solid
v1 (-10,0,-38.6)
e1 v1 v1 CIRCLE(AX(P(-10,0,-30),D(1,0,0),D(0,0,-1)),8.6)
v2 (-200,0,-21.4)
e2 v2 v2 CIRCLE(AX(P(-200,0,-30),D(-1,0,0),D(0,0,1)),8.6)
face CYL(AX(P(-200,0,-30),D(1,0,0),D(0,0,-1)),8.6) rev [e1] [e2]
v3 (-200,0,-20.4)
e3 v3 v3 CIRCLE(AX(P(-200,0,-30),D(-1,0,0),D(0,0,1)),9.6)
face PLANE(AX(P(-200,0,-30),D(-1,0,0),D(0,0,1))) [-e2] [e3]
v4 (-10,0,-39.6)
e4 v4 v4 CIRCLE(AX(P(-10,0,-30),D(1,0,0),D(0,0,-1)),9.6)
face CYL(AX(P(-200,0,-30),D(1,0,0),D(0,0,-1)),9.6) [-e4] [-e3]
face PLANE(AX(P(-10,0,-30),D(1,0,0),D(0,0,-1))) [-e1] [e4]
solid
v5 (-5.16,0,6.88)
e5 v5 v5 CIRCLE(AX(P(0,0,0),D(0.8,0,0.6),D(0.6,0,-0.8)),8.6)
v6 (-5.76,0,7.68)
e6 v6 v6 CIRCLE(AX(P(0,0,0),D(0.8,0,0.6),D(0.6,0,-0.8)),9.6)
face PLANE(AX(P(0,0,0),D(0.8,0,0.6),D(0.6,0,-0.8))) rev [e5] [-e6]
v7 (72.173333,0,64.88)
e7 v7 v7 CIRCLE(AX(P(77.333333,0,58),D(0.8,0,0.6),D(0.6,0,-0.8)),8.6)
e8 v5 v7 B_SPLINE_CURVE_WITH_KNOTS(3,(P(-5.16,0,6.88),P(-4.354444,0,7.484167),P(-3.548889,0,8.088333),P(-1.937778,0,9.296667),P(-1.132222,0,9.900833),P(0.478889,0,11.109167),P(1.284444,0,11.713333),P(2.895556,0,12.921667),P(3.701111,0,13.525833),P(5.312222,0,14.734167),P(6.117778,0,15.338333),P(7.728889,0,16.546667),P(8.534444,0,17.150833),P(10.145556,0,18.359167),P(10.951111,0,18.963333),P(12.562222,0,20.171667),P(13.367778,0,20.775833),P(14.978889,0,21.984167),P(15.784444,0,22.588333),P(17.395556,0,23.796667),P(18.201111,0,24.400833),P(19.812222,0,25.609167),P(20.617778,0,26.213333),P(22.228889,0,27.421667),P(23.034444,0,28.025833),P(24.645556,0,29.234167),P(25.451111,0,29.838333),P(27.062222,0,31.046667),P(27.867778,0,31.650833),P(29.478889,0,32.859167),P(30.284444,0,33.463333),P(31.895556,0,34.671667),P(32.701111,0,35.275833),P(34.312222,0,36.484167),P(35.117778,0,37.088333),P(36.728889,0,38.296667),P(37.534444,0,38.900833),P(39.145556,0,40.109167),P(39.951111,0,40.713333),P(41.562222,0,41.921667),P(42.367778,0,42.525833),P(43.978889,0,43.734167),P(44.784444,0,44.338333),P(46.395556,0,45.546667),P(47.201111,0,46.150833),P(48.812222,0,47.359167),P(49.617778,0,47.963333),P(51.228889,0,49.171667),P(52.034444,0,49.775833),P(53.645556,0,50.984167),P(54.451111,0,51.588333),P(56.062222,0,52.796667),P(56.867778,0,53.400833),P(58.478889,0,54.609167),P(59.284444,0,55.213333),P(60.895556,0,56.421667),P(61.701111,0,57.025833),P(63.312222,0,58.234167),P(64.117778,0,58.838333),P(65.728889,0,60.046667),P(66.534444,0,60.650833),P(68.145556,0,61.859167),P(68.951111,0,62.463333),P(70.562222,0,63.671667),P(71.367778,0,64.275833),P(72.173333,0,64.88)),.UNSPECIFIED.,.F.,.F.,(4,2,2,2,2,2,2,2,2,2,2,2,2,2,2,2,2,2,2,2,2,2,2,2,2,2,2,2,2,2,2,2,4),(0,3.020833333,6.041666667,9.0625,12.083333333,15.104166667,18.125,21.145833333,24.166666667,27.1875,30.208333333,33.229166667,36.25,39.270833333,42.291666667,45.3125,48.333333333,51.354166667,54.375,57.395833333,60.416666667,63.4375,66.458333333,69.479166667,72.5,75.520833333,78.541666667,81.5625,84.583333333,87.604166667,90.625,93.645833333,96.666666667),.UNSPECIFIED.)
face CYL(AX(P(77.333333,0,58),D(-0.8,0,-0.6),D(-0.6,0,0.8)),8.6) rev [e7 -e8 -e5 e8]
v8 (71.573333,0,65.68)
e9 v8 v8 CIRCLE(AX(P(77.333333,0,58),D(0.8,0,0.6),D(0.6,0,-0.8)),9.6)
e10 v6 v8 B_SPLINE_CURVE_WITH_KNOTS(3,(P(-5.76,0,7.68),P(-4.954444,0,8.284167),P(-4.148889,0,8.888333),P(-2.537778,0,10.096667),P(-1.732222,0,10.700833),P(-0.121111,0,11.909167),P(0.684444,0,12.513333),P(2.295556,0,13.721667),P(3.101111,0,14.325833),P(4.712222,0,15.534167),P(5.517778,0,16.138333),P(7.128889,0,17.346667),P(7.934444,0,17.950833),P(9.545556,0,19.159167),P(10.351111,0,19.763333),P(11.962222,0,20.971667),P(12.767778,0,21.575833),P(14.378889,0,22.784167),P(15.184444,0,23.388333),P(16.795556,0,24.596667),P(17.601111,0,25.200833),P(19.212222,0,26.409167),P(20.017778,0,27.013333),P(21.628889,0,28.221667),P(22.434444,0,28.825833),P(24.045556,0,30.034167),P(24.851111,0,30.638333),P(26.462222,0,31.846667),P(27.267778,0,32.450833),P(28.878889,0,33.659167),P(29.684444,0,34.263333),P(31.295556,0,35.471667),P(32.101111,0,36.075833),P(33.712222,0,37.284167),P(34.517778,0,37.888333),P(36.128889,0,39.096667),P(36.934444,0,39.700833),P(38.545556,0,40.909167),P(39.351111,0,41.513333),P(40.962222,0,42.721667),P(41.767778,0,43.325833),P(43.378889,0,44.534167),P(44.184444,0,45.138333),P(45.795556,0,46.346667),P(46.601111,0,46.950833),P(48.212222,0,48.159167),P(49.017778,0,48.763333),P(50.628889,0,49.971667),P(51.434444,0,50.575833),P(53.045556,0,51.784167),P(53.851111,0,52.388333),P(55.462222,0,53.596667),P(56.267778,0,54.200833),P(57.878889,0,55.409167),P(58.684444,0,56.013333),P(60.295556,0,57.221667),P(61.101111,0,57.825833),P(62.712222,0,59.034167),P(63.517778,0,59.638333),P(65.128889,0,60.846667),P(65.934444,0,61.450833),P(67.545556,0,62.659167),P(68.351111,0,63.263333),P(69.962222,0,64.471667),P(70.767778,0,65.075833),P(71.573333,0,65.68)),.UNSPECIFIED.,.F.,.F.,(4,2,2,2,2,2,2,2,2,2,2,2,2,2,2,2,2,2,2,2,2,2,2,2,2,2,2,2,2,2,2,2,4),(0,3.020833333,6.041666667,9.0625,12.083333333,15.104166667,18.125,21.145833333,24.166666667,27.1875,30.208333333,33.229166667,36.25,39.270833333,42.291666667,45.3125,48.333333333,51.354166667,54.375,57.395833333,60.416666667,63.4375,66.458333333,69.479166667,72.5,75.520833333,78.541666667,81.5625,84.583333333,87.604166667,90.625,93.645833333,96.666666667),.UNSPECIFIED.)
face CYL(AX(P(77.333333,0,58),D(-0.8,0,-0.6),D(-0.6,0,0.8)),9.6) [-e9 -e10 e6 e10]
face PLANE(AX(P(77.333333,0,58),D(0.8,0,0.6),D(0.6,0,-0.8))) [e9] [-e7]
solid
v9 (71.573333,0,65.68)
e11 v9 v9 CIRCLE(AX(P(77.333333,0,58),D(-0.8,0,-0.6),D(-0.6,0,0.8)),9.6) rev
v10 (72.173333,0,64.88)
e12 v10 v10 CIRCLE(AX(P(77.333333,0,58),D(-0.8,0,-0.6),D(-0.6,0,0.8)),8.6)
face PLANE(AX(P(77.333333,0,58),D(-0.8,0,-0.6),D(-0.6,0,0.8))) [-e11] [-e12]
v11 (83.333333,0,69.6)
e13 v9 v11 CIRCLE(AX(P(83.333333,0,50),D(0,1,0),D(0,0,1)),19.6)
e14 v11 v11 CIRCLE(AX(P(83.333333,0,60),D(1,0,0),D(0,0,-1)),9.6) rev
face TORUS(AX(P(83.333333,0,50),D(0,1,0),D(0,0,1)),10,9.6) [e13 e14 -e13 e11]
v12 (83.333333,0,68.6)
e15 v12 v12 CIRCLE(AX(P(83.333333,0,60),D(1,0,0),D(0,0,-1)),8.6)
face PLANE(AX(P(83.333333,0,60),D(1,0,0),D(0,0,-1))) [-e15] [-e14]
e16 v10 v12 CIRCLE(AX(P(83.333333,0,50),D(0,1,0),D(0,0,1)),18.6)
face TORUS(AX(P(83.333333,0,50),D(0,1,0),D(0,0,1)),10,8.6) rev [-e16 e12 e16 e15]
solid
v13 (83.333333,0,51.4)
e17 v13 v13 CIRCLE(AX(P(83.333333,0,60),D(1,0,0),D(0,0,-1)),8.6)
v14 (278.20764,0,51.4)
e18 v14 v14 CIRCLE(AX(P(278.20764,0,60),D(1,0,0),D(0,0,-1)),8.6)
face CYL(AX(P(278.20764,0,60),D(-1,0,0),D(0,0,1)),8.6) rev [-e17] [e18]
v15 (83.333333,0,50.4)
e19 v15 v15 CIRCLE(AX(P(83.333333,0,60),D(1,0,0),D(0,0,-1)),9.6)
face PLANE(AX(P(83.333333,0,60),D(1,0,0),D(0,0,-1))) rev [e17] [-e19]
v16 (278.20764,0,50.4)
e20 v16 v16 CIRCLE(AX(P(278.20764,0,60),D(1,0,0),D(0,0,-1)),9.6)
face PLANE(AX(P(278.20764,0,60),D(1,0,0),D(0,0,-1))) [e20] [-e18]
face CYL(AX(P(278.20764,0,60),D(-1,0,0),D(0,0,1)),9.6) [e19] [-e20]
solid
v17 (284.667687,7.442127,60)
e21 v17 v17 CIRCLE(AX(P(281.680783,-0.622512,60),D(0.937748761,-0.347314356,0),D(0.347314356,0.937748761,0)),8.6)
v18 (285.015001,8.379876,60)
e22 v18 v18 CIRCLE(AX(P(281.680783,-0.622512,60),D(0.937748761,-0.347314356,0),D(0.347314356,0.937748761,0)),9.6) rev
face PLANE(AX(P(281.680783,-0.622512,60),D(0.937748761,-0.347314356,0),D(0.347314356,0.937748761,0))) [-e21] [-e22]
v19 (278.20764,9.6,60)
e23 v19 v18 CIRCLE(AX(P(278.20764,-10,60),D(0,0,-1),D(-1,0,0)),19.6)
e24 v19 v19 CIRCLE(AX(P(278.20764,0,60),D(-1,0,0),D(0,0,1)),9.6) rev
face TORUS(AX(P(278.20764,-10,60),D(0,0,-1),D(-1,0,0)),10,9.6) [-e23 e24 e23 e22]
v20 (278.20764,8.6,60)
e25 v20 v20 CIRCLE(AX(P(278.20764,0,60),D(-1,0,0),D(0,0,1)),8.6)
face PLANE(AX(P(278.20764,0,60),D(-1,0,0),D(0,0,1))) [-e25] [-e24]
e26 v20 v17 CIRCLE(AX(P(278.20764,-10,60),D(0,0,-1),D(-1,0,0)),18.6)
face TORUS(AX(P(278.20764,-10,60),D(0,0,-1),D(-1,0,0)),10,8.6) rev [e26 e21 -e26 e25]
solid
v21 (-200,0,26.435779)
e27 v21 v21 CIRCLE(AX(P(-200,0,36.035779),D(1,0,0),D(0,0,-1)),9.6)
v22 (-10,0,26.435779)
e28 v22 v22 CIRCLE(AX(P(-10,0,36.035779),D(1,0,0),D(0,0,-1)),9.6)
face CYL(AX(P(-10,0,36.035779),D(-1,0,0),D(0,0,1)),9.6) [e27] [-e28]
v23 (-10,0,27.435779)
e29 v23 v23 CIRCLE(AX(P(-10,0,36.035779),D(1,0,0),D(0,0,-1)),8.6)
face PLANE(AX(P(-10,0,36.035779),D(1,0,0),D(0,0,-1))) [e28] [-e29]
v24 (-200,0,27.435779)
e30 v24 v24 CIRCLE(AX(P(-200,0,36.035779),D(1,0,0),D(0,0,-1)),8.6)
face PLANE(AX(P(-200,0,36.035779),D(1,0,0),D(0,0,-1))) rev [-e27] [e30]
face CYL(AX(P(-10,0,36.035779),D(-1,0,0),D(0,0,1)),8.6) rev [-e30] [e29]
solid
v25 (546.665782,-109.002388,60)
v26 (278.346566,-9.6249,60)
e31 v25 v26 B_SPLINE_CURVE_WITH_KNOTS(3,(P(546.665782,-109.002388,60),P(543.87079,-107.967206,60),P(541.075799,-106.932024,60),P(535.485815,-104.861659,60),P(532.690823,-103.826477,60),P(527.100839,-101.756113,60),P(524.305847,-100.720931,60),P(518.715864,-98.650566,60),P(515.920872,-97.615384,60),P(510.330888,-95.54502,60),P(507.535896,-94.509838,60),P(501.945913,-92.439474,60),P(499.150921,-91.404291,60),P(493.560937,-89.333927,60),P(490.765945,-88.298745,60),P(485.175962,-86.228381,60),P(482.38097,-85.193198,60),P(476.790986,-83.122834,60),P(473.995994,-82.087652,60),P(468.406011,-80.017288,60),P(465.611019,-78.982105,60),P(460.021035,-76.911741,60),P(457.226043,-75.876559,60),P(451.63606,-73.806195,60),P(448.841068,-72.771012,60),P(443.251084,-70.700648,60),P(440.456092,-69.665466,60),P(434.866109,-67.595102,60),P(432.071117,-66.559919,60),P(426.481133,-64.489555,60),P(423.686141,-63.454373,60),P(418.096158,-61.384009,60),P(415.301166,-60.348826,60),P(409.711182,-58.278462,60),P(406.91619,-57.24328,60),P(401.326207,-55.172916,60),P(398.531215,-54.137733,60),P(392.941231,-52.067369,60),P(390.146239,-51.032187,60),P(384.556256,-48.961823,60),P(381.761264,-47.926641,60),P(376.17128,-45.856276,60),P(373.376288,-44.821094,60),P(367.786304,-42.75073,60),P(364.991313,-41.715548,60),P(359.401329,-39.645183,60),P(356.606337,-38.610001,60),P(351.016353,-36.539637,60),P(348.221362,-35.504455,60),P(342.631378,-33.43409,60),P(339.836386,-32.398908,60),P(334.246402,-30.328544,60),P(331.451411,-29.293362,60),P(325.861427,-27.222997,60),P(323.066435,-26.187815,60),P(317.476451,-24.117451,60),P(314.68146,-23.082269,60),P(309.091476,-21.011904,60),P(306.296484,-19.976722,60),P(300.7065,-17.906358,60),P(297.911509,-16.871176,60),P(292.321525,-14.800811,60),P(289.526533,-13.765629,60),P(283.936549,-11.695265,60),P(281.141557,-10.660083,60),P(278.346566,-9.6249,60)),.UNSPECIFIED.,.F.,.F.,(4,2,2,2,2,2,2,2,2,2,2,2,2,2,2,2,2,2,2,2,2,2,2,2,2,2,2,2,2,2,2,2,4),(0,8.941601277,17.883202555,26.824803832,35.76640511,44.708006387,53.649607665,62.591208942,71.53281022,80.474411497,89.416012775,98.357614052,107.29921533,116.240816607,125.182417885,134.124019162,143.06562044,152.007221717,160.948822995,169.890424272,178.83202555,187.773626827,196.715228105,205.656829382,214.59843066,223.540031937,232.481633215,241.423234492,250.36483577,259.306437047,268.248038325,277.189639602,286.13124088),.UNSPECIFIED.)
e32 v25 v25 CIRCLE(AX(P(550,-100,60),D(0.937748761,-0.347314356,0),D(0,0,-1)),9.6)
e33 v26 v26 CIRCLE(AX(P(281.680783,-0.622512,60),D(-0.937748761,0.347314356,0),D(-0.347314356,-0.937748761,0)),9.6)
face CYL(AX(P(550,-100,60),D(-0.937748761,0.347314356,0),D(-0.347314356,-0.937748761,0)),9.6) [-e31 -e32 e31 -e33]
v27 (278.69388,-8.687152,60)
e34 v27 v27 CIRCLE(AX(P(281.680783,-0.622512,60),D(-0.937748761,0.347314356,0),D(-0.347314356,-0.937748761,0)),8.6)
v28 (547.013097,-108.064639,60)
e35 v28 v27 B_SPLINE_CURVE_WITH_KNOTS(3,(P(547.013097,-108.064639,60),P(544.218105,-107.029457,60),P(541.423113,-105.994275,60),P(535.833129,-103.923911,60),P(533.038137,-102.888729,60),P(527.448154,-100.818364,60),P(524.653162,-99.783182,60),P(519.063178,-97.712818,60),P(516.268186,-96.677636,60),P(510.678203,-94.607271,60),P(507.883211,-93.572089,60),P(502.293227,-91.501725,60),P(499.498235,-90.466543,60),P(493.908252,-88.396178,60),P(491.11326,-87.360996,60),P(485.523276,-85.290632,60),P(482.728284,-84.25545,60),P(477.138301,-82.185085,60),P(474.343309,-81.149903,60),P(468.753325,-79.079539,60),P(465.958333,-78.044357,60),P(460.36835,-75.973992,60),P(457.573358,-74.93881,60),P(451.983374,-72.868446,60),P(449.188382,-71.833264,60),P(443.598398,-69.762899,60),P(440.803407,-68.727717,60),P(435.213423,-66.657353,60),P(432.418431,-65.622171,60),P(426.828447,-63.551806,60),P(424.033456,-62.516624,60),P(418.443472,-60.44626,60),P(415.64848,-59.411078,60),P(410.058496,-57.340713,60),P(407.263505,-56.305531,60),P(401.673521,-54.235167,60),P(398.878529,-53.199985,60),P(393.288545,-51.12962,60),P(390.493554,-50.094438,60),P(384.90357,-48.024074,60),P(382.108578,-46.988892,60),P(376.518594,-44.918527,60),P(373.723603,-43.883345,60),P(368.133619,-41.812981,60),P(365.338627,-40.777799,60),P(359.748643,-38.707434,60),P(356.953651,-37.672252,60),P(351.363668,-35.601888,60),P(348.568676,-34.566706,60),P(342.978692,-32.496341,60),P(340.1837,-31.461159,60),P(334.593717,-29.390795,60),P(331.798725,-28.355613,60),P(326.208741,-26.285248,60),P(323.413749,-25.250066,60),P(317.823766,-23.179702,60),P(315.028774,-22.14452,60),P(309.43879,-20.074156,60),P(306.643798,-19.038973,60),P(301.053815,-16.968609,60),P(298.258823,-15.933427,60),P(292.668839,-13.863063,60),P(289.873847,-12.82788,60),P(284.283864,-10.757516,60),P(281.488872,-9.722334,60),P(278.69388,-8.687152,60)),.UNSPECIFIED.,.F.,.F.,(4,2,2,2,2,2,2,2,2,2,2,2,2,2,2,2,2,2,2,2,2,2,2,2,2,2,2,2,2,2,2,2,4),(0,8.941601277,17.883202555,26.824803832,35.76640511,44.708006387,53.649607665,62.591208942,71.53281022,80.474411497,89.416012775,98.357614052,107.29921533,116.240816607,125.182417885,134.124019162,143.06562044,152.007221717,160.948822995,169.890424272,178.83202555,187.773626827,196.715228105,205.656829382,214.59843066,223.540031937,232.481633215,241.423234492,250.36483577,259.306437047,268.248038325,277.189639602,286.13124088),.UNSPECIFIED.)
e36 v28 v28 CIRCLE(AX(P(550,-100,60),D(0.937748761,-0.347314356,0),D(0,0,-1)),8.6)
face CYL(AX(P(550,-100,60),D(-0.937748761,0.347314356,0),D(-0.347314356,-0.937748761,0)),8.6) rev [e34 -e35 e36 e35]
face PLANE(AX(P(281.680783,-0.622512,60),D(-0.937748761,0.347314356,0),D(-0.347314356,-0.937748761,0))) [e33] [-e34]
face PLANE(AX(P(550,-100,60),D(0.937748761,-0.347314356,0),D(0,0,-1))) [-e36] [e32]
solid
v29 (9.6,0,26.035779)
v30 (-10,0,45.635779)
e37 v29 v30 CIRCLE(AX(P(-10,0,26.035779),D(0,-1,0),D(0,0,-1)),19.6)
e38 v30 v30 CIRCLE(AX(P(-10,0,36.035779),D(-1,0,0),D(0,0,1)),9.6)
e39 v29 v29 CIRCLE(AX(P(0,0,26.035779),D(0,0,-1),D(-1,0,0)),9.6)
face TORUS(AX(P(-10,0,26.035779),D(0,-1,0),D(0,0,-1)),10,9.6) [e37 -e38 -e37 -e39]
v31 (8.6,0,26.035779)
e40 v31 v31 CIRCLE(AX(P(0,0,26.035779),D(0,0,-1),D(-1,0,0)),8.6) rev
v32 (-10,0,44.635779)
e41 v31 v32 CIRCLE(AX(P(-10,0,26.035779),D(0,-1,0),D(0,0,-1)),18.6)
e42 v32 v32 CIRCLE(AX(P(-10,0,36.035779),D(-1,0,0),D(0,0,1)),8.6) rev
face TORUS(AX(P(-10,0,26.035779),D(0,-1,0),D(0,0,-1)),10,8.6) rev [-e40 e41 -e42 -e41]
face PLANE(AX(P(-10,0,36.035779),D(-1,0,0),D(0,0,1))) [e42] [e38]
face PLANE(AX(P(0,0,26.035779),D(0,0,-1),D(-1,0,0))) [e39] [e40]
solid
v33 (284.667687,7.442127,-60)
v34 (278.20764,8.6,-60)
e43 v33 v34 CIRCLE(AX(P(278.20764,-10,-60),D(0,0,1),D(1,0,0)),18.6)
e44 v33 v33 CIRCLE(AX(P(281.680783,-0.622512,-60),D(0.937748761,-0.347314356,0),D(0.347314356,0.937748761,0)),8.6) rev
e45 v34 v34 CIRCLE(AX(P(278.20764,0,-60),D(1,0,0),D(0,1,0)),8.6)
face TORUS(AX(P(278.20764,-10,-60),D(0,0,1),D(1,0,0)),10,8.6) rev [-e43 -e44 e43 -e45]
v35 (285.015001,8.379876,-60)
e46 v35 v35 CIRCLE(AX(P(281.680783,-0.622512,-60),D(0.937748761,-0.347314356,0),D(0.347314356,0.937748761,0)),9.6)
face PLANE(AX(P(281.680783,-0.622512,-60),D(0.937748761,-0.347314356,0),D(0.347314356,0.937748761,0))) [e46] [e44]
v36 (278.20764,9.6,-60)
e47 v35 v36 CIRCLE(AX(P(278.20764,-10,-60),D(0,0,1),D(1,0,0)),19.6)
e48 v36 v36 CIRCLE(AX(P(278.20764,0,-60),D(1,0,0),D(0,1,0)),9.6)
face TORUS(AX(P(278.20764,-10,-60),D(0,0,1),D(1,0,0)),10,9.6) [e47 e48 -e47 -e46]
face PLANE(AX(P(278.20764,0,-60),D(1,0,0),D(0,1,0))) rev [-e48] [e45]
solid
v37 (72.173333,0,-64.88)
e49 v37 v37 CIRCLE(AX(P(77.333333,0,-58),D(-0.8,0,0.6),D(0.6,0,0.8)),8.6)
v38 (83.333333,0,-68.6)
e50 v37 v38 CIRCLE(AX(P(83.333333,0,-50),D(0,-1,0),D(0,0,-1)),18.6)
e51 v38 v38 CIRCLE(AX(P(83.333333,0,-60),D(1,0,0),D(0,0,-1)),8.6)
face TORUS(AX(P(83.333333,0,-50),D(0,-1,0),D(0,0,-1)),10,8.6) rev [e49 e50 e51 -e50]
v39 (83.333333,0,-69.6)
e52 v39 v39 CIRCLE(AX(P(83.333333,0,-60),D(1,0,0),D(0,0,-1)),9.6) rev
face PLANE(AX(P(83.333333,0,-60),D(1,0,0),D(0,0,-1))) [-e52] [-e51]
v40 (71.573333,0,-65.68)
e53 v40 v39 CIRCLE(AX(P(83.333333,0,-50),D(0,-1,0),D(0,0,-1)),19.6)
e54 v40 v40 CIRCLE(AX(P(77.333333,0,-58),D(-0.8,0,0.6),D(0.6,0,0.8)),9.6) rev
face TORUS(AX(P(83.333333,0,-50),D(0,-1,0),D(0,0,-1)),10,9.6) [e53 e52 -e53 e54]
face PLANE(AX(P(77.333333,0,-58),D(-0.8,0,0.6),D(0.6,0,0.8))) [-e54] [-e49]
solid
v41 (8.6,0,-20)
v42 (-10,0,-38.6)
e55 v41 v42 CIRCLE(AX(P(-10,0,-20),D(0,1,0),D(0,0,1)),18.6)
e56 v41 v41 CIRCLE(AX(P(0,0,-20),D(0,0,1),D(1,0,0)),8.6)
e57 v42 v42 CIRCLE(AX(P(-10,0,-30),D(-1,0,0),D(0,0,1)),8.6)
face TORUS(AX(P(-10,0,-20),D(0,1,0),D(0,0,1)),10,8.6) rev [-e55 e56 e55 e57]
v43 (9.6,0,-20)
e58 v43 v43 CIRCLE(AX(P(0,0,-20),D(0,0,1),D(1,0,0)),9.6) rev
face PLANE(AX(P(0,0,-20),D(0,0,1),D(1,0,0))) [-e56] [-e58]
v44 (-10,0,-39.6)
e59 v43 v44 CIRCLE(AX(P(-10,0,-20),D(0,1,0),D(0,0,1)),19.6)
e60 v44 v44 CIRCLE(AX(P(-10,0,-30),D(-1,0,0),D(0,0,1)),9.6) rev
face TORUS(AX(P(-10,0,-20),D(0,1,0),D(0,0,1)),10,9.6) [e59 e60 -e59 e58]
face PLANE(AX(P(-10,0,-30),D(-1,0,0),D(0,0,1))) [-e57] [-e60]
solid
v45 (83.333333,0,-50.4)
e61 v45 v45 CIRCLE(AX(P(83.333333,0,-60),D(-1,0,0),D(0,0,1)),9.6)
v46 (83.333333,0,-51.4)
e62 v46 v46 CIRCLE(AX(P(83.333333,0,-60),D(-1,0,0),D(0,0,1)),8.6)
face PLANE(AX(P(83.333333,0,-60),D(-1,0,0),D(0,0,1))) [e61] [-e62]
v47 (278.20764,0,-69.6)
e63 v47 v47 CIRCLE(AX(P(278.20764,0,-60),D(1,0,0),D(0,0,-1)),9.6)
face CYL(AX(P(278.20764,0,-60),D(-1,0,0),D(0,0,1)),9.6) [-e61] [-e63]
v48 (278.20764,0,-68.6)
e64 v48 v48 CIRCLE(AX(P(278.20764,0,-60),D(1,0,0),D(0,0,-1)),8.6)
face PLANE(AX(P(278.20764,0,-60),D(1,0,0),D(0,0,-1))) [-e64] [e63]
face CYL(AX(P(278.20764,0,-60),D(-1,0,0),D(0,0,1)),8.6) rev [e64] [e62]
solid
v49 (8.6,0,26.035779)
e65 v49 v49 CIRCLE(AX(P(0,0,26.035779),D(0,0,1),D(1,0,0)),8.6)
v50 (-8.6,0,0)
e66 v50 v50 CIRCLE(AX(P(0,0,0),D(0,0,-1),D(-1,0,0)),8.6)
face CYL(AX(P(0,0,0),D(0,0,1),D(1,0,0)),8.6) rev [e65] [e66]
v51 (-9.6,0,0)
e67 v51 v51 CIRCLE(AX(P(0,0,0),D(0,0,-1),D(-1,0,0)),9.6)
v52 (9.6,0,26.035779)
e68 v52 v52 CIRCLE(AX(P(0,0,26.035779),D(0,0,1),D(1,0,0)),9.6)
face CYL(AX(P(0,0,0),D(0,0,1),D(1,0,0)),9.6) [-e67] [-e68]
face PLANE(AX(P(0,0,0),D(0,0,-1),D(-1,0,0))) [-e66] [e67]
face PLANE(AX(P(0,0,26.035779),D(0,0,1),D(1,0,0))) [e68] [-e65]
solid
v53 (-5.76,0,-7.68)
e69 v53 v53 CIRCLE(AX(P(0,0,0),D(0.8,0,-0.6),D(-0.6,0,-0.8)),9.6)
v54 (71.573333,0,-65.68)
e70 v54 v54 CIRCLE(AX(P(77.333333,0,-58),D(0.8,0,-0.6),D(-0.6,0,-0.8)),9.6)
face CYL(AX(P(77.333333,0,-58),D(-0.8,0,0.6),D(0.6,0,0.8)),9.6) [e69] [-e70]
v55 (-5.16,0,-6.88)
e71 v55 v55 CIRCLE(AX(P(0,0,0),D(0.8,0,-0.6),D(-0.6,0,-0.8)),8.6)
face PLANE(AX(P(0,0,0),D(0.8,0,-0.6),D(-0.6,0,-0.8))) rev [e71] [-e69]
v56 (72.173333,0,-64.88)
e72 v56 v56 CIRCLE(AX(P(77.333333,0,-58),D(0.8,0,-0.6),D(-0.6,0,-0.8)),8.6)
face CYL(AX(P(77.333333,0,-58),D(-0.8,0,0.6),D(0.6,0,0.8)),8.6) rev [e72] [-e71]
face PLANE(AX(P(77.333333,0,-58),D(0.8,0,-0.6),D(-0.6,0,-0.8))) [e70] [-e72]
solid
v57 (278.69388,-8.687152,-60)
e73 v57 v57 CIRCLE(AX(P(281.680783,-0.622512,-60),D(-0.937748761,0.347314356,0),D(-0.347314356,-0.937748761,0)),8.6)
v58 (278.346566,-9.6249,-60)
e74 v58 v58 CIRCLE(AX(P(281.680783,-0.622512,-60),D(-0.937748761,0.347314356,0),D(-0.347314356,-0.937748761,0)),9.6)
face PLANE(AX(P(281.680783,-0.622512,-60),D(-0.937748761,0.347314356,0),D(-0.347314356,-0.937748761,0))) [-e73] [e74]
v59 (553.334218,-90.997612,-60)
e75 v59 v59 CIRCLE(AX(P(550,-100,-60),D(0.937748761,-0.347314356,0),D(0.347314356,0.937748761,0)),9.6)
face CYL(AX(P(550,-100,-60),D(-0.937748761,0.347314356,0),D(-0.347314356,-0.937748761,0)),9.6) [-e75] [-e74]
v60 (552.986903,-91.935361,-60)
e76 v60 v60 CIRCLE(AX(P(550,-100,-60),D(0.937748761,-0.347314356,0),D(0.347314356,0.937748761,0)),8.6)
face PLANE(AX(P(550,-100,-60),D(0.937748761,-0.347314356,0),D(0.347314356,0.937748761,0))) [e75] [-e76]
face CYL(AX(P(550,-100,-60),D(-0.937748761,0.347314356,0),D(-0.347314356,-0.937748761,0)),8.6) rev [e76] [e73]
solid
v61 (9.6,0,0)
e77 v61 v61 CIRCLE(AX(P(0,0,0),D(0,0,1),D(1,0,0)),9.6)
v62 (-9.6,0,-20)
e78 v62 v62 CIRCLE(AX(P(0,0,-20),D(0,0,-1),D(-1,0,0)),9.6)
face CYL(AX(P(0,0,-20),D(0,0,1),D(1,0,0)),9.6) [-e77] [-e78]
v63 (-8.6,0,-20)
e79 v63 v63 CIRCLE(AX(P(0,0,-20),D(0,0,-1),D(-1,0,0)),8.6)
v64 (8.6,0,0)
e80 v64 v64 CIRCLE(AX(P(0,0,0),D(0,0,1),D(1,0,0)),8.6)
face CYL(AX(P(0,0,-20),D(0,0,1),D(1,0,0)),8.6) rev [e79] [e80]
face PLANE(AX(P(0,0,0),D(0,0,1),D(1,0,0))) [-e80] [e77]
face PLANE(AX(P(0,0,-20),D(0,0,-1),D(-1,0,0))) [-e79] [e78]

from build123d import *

# Parameters (mm, degrees)
STEERING_SUPPORT_START                       = -200
STEERING_SUPPORT_STEERING_SUPPORT_2_OUTL_R   = 9.6
STEERING_SUPPORT_STEERING_SUPPORT_2_OUTL_R_2 = 8.6
STEERING_SUPPORT_STEERING_SUPPORT_2_DEPTH    = 190
STEERING_SUPPORT_STEERING_SUPPORT_2_2_OU_R   = 9.6
STEERING_SUPPORT_STEERING_SUPPORT_2_2_OU_R_2 = 8.6
STEERING_SUPPORT_STEERING_SUPPORT_2_2_ANGLE  = 90
STEERING_SUPPORT_STEERING_SUPPORT_2_3_OU_R   = 9.6
STEERING_SUPPORT_STEERING_SUPPORT_2_3_OU_R_2 = 8.6
STEERING_SUPPORT_STEERING_SUPPORT_2_3_DEPTH  = 26.03577931
STEERING_SUPPORT_START_2                     = -20
STEERING_SUPPORT_STEERING_SUPPORT_2_4_OU_R   = 9.6
STEERING_SUPPORT_STEERING_SUPPORT_2_4_OU_R_2 = 8.6
STEERING_SUPPORT_STEERING_SUPPORT_2_4_DEPTH  = 20
STEERING_SUPPORT_STEERING_SUPPORT_2_5_OU_R   = 9.6
STEERING_SUPPORT_STEERING_SUPPORT_2_5_OU_R_2 = 8.6
STEERING_SUPPORT_STEERING_SUPPORT_2_5_ANGLE  = 90
STEERING_SUPPORT_STEERING_SUPPORT_2_6_OU_R   = 9.6
STEERING_SUPPORT_STEERING_SUPPORT_2_6_OU_R_2 = 8.6
STEERING_SUPPORT_STEERING_SUPPORT_2_6_DEPTH  = 190
SKETCH16_R                                   = 9.6
SKETCH16_R_2                                 = 8.6
STEERING_SUPPORT_STEERING_SUPPORT_4_DEPTH    = 96.666666667
SKETCH16_ON_SEGMENT_2_R                      = 9.6
SKETCH16_ON_SEGMENT_2_R_2                    = 8.6
STEERING_SUPPORT_STEERING_SUPPORT_4_2_ANGLE  = 36.869897646
SKETCH16_ON_SEGMENT_3_R                      = 9.6
SKETCH16_ON_SEGMENT_3_R_2                    = 8.6
STEERING_SUPPORT_STEERING_SUPPORT_4_3_DEPTH  = 196.666666667
SKETCH17_R                                   = 9.6
SKETCH17_R_2                                 = 8.6
STEERING_SUPPORT_STEERING_SUPPORT_5_DEPTH    = 194.874306569
SKETCH17_ON_SEGMENT_2_R                      = 9.6
SKETCH17_ON_SEGMENT_2_R_2                    = 8.6
STEERING_SUPPORT_STEERING_SUPPORT_5_2_ANGLE  = 20.32313683
SKETCH17_ON_SEGMENT_3_R                      = 9.6
SKETCH17_ON_SEGMENT_3_R_2                    = 8.6
STEERING_SUPPORT_STEERING_SUPPORT_5_3_DEPTH  = 286.13124088
SKETCH19_ON_SEGMENT_1_R                      = 9.6
SKETCH19_ON_SEGMENT_1_R_2                    = 8.6
STEERING_SUPPORT_STEERING_SUPPORT_6_ANGLE    = 20.32313683
SKETCH19_R                                   = 9.6
SKETCH19_R_2                                 = 8.6
STEERING_SUPPORT_STEERING_SUPPORT_6_2_DEPTH  = 286.13124088
SKETCH110_R                                  = 9.6
SKETCH110_R_2                                = 8.6
STEERING_SUPPORT_STEERING_SUPPORT_7_DEPTH    = 96.666666667
SKETCH110_ON_SEGMENT_2_R                     = 9.6
SKETCH110_ON_SEGMENT_2_R_2                   = 8.6
STEERING_SUPPORT_STEERING_SUPPORT_7_2_ANGLE  = 36.869897646
SKETCH110_ON_SEGMENT_3_R                     = 9.6
SKETCH110_ON_SEGMENT_3_R_2                   = 8.6
STEERING_SUPPORT_STEERING_SUPPORT_7_3_DEPTH  = 194.874306569


# Read off the part's stored shape, not the designer's step: Steering_support STEERING SUPPORT(2)
with BuildPart() as part:
    # Steering_support STEERING SUPPORT(2) outl → Steering_support STEERING SUPPORT(2) (new body)
    with BuildSketch(Plane.YZ.offset(STEERING_SUPPORT_START)):
        with Locations((0, 36.03577931)):
            Circle(STEERING_SUPPORT_STEERING_SUPPORT_2_OUTL_R)
        with Locations((0, 36.03577931)):
            Circle(STEERING_SUPPORT_STEERING_SUPPORT_2_OUTL_R_2, mode=Mode.SUBTRACT)
    extrude(amount=STEERING_SUPPORT_STEERING_SUPPORT_2_DEPTH)


with BuildPart() as body_2:
    # Steering_support STEERING SUPPORT_2 2 ou → Steering_support STEERING SUPPORT_2 2 (revolve)
    with BuildSketch(Plane(origin=(-10, 0, 26.03577931), x_dir=(0, 0, 1), z_dir=(-1, 0, 0))):
        with Locations((10, 0)):
            Circle(STEERING_SUPPORT_STEERING_SUPPORT_2_2_OU_R)
        with Locations((10, 0)):
            Circle(STEERING_SUPPORT_STEERING_SUPPORT_2_2_OU_R_2, mode=Mode.SUBTRACT)
    revolve(axis=Axis((-10, 0, 26.03577931), (0, 1, 0)), revolution_arc=STEERING_SUPPORT_STEERING_SUPPORT_2_2_ANGLE)


with BuildPart() as body_3:
    # Steering_support STEERING SUPPORT_2 3 ou → Steering_support STEERING SUPPORT_2 3 (new body)
    with BuildSketch(Plane.XY):
        Circle(STEERING_SUPPORT_STEERING_SUPPORT_2_3_OU_R)
        Circle(STEERING_SUPPORT_STEERING_SUPPORT_2_3_OU_R_2, mode=Mode.SUBTRACT)
    extrude(amount=STEERING_SUPPORT_STEERING_SUPPORT_2_3_DEPTH)


with BuildPart() as body_4:
    # Steering_support STEERING SUPPORT_2 4 ou → Steering_support STEERING SUPPORT_2 4 (new body)
    with BuildSketch(Plane.XY.offset(STEERING_SUPPORT_START_2)):
        Circle(STEERING_SUPPORT_STEERING_SUPPORT_2_4_OU_R)
        Circle(STEERING_SUPPORT_STEERING_SUPPORT_2_4_OU_R_2, mode=Mode.SUBTRACT)
    extrude(amount=STEERING_SUPPORT_STEERING_SUPPORT_2_4_DEPTH)


with BuildPart() as body_5:
    # Steering_support STEERING SUPPORT_2 5 ou → Steering_support STEERING SUPPORT_2 5 (revolve)
    with BuildSketch(Plane(origin=(-10, 0, -20), x_dir=(1, 0, 0), z_dir=(0, 0, 1))):
        with Locations((10, 0)):
            Circle(STEERING_SUPPORT_STEERING_SUPPORT_2_5_OU_R)
        with Locations((10, 0)):
            Circle(STEERING_SUPPORT_STEERING_SUPPORT_2_5_OU_R_2, mode=Mode.SUBTRACT)
    revolve(axis=Axis((-10, 0, -20), (0, 1, 0)), revolution_arc=STEERING_SUPPORT_STEERING_SUPPORT_2_5_ANGLE)


with BuildPart() as body_6:
    # Steering_support STEERING SUPPORT_2 6 ou → Steering_support STEERING SUPPORT_2 6 (new body)
    with BuildSketch(Plane.YZ.offset(STEERING_SUPPORT_START)):
        with Locations((0, -30)):
            Circle(STEERING_SUPPORT_STEERING_SUPPORT_2_6_OU_R)
        with Locations((0, -30)):
            Circle(STEERING_SUPPORT_STEERING_SUPPORT_2_6_OU_R_2, mode=Mode.SUBTRACT)
    extrude(amount=STEERING_SUPPORT_STEERING_SUPPORT_2_6_DEPTH)


with BuildPart() as body_7:
    # Sketch16 → Steering_support STEERING SUPPORT(4) (new body)
    with BuildSketch(Plane(origin=(0, 0, 0), x_dir=(0.6, 0, -0.8), z_dir=(0.8, 0, 0.6))):
        Circle(SKETCH16_R)
        Circle(SKETCH16_R_2, mode=Mode.SUBTRACT)
    extrude(amount=STEERING_SUPPORT_STEERING_SUPPORT_4_DEPTH)


with BuildPart() as body_8:
    # Sketch16 on segment 2 (carried to the start of arc 2) → Steering_support STEERING SUPPORT_4 2 (revolve)
    with BuildSketch(Plane(origin=(77.333333333, 0, 58), x_dir=(0.6, 0, -0.8), z_dir=(0.8, 0, 0.6))):
        Circle(SKETCH16_ON_SEGMENT_2_R)
        Circle(SKETCH16_ON_SEGMENT_2_R_2, mode=Mode.SUBTRACT)
    revolve(axis=Axis((83.333333333, 0, 50), (0, 1, 0)), revolution_arc=STEERING_SUPPORT_STEERING_SUPPORT_4_2_ANGLE)


with BuildPart() as body_9:
    # Sketch16 on segment 3 (carried to segment 3) → Steering_support STEERING SUPPORT_4 3 (new body)
    with BuildSketch(Plane(origin=(83.333333333, 0, 60), x_dir=(0, 0, -1), z_dir=(1, 0, 0))):
        Circle(SKETCH16_ON_SEGMENT_3_R)
        Circle(SKETCH16_ON_SEGMENT_3_R_2, mode=Mode.SUBTRACT)
    extrude(amount=STEERING_SUPPORT_STEERING_SUPPORT_4_3_DEPTH)


with BuildPart() as body_9_2:
    # Sketch17 → Steering_support STEERING SUPPORT(5) (new body)
    with BuildSketch(Plane(origin=(83.333333333, 0, 60), x_dir=(0, 1, 0), z_dir=(1, 0, 0))):
        Circle(SKETCH17_R)
        Circle(SKETCH17_R_2, mode=Mode.SUBTRACT)
    extrude(amount=STEERING_SUPPORT_STEERING_SUPPORT_5_DEPTH)


with BuildPart() as body_10:
    # Sketch17 on segment 2 (carried to the start of arc 2) → Steering_support STEERING SUPPORT_5 2 (revolve)
    with BuildSketch(Plane(origin=(278.207639902, 0, 60), x_dir=(0, 1, 0), z_dir=(1, 0, 0))):
        Circle(SKETCH17_ON_SEGMENT_2_R)
        Circle(SKETCH17_ON_SEGMENT_2_R_2, mode=Mode.SUBTRACT)
    revolve(axis=Axis((278.207639902, -10, 60), (0, 0, -1)), revolution_arc=STEERING_SUPPORT_STEERING_SUPPORT_5_2_ANGLE)


with BuildPart() as body_11:
    # Sketch17 on segment 3 (carried to segment 3) → Steering_support STEERING SUPPORT_5 3 (new body)
    with BuildSketch(Plane(origin=(281.68078346, -0.622512393, 60), x_dir=(0.347314356, 0.937748761, 0), z_dir=(0.937748761, -0.347314356, 0))):
        Circle(SKETCH17_ON_SEGMENT_3_R)
        Circle(SKETCH17_ON_SEGMENT_3_R_2, mode=Mode.SUBTRACT)
    extrude(amount=STEERING_SUPPORT_STEERING_SUPPORT_5_3_DEPTH)


with BuildPart() as body_12:
    # Sketch19 on segment 1 (carried to the start of arc 1) → Steering_support STEERING SUPPORT(6) (revolve)
    with BuildSketch(Plane(origin=(281.68078346, -0.622512393, -60), x_dir=(-0.347314356, -0.937748761, 0), z_dir=(-0.937748761, 0.347314356, 0))):
        Circle(SKETCH19_ON_SEGMENT_1_R)
        Circle(SKETCH19_ON_SEGMENT_1_R_2, mode=Mode.SUBTRACT)
    revolve(axis=Axis((278.207639902, -10, -60), (0, 0, 1)), revolution_arc=STEERING_SUPPORT_STEERING_SUPPORT_6_ANGLE)


with BuildPart() as body_13:
    # Sketch19 → Steering_support STEERING SUPPORT_6 2 (new body)
    with BuildSketch(Plane(origin=(281.68078346, -0.622512393, -60), x_dir=(0.347314355823594, 0.9377487607237036, 0), z_dir=(0.9377487607237037, -0.347314355823594, 0))):
        Circle(SKETCH19_R)
        Circle(SKETCH19_R_2, mode=Mode.SUBTRACT)
    extrude(amount=STEERING_SUPPORT_STEERING_SUPPORT_6_2_DEPTH)


with BuildPart() as body_14:
    # Sketch110 → Steering_support STEERING SUPPORT(7) (new body)
    with BuildSketch(Plane(origin=(0, 0, 0), x_dir=(-0.6, 0, -0.8), z_dir=(0.8, 0, -0.6))):
        Circle(SKETCH110_R)
        Circle(SKETCH110_R_2, mode=Mode.SUBTRACT)
    extrude(amount=STEERING_SUPPORT_STEERING_SUPPORT_7_DEPTH)


with BuildPart() as body_15:
    # Sketch110 on segment 2 (carried to the start of arc 2) → Steering_support STEERING SUPPORT_7 2 (revolve)
    with BuildSketch(Plane(origin=(77.333333333, 0, -58), x_dir=(-0.6, 0, -0.8), z_dir=(0.8, 0, -0.6))):
        Circle(SKETCH110_ON_SEGMENT_2_R)
        Circle(SKETCH110_ON_SEGMENT_2_R_2, mode=Mode.SUBTRACT)
    revolve(axis=Axis((83.333333333, 0, -50), (0, -1, 0)), revolution_arc=STEERING_SUPPORT_STEERING_SUPPORT_7_2_ANGLE)


with BuildPart() as body_16:
    # Sketch110 on segment 3 (carried to segment 3) → Steering_support STEERING SUPPORT_7 3 (new body)
    with BuildSketch(Plane(origin=(83.333333333, 0, -60), x_dir=(0, 0, -1), z_dir=(1, 0, 0))):
        Circle(SKETCH110_ON_SEGMENT_3_R)
        Circle(SKETCH110_ON_SEGMENT_3_R_2, mode=Mode.SUBTRACT)
    extrude(amount=STEERING_SUPPORT_STEERING_SUPPORT_7_3_DEPTH)


solid = Compound([part.part, body_2.part, body_3.part, body_4.part, body_5.part, body_6.part, body_7.part, body_8.part, body_9_2.part, body_10.part, body_11.part, body_12.part, body_13.part, body_14.part, body_15.part, body_16.part])
